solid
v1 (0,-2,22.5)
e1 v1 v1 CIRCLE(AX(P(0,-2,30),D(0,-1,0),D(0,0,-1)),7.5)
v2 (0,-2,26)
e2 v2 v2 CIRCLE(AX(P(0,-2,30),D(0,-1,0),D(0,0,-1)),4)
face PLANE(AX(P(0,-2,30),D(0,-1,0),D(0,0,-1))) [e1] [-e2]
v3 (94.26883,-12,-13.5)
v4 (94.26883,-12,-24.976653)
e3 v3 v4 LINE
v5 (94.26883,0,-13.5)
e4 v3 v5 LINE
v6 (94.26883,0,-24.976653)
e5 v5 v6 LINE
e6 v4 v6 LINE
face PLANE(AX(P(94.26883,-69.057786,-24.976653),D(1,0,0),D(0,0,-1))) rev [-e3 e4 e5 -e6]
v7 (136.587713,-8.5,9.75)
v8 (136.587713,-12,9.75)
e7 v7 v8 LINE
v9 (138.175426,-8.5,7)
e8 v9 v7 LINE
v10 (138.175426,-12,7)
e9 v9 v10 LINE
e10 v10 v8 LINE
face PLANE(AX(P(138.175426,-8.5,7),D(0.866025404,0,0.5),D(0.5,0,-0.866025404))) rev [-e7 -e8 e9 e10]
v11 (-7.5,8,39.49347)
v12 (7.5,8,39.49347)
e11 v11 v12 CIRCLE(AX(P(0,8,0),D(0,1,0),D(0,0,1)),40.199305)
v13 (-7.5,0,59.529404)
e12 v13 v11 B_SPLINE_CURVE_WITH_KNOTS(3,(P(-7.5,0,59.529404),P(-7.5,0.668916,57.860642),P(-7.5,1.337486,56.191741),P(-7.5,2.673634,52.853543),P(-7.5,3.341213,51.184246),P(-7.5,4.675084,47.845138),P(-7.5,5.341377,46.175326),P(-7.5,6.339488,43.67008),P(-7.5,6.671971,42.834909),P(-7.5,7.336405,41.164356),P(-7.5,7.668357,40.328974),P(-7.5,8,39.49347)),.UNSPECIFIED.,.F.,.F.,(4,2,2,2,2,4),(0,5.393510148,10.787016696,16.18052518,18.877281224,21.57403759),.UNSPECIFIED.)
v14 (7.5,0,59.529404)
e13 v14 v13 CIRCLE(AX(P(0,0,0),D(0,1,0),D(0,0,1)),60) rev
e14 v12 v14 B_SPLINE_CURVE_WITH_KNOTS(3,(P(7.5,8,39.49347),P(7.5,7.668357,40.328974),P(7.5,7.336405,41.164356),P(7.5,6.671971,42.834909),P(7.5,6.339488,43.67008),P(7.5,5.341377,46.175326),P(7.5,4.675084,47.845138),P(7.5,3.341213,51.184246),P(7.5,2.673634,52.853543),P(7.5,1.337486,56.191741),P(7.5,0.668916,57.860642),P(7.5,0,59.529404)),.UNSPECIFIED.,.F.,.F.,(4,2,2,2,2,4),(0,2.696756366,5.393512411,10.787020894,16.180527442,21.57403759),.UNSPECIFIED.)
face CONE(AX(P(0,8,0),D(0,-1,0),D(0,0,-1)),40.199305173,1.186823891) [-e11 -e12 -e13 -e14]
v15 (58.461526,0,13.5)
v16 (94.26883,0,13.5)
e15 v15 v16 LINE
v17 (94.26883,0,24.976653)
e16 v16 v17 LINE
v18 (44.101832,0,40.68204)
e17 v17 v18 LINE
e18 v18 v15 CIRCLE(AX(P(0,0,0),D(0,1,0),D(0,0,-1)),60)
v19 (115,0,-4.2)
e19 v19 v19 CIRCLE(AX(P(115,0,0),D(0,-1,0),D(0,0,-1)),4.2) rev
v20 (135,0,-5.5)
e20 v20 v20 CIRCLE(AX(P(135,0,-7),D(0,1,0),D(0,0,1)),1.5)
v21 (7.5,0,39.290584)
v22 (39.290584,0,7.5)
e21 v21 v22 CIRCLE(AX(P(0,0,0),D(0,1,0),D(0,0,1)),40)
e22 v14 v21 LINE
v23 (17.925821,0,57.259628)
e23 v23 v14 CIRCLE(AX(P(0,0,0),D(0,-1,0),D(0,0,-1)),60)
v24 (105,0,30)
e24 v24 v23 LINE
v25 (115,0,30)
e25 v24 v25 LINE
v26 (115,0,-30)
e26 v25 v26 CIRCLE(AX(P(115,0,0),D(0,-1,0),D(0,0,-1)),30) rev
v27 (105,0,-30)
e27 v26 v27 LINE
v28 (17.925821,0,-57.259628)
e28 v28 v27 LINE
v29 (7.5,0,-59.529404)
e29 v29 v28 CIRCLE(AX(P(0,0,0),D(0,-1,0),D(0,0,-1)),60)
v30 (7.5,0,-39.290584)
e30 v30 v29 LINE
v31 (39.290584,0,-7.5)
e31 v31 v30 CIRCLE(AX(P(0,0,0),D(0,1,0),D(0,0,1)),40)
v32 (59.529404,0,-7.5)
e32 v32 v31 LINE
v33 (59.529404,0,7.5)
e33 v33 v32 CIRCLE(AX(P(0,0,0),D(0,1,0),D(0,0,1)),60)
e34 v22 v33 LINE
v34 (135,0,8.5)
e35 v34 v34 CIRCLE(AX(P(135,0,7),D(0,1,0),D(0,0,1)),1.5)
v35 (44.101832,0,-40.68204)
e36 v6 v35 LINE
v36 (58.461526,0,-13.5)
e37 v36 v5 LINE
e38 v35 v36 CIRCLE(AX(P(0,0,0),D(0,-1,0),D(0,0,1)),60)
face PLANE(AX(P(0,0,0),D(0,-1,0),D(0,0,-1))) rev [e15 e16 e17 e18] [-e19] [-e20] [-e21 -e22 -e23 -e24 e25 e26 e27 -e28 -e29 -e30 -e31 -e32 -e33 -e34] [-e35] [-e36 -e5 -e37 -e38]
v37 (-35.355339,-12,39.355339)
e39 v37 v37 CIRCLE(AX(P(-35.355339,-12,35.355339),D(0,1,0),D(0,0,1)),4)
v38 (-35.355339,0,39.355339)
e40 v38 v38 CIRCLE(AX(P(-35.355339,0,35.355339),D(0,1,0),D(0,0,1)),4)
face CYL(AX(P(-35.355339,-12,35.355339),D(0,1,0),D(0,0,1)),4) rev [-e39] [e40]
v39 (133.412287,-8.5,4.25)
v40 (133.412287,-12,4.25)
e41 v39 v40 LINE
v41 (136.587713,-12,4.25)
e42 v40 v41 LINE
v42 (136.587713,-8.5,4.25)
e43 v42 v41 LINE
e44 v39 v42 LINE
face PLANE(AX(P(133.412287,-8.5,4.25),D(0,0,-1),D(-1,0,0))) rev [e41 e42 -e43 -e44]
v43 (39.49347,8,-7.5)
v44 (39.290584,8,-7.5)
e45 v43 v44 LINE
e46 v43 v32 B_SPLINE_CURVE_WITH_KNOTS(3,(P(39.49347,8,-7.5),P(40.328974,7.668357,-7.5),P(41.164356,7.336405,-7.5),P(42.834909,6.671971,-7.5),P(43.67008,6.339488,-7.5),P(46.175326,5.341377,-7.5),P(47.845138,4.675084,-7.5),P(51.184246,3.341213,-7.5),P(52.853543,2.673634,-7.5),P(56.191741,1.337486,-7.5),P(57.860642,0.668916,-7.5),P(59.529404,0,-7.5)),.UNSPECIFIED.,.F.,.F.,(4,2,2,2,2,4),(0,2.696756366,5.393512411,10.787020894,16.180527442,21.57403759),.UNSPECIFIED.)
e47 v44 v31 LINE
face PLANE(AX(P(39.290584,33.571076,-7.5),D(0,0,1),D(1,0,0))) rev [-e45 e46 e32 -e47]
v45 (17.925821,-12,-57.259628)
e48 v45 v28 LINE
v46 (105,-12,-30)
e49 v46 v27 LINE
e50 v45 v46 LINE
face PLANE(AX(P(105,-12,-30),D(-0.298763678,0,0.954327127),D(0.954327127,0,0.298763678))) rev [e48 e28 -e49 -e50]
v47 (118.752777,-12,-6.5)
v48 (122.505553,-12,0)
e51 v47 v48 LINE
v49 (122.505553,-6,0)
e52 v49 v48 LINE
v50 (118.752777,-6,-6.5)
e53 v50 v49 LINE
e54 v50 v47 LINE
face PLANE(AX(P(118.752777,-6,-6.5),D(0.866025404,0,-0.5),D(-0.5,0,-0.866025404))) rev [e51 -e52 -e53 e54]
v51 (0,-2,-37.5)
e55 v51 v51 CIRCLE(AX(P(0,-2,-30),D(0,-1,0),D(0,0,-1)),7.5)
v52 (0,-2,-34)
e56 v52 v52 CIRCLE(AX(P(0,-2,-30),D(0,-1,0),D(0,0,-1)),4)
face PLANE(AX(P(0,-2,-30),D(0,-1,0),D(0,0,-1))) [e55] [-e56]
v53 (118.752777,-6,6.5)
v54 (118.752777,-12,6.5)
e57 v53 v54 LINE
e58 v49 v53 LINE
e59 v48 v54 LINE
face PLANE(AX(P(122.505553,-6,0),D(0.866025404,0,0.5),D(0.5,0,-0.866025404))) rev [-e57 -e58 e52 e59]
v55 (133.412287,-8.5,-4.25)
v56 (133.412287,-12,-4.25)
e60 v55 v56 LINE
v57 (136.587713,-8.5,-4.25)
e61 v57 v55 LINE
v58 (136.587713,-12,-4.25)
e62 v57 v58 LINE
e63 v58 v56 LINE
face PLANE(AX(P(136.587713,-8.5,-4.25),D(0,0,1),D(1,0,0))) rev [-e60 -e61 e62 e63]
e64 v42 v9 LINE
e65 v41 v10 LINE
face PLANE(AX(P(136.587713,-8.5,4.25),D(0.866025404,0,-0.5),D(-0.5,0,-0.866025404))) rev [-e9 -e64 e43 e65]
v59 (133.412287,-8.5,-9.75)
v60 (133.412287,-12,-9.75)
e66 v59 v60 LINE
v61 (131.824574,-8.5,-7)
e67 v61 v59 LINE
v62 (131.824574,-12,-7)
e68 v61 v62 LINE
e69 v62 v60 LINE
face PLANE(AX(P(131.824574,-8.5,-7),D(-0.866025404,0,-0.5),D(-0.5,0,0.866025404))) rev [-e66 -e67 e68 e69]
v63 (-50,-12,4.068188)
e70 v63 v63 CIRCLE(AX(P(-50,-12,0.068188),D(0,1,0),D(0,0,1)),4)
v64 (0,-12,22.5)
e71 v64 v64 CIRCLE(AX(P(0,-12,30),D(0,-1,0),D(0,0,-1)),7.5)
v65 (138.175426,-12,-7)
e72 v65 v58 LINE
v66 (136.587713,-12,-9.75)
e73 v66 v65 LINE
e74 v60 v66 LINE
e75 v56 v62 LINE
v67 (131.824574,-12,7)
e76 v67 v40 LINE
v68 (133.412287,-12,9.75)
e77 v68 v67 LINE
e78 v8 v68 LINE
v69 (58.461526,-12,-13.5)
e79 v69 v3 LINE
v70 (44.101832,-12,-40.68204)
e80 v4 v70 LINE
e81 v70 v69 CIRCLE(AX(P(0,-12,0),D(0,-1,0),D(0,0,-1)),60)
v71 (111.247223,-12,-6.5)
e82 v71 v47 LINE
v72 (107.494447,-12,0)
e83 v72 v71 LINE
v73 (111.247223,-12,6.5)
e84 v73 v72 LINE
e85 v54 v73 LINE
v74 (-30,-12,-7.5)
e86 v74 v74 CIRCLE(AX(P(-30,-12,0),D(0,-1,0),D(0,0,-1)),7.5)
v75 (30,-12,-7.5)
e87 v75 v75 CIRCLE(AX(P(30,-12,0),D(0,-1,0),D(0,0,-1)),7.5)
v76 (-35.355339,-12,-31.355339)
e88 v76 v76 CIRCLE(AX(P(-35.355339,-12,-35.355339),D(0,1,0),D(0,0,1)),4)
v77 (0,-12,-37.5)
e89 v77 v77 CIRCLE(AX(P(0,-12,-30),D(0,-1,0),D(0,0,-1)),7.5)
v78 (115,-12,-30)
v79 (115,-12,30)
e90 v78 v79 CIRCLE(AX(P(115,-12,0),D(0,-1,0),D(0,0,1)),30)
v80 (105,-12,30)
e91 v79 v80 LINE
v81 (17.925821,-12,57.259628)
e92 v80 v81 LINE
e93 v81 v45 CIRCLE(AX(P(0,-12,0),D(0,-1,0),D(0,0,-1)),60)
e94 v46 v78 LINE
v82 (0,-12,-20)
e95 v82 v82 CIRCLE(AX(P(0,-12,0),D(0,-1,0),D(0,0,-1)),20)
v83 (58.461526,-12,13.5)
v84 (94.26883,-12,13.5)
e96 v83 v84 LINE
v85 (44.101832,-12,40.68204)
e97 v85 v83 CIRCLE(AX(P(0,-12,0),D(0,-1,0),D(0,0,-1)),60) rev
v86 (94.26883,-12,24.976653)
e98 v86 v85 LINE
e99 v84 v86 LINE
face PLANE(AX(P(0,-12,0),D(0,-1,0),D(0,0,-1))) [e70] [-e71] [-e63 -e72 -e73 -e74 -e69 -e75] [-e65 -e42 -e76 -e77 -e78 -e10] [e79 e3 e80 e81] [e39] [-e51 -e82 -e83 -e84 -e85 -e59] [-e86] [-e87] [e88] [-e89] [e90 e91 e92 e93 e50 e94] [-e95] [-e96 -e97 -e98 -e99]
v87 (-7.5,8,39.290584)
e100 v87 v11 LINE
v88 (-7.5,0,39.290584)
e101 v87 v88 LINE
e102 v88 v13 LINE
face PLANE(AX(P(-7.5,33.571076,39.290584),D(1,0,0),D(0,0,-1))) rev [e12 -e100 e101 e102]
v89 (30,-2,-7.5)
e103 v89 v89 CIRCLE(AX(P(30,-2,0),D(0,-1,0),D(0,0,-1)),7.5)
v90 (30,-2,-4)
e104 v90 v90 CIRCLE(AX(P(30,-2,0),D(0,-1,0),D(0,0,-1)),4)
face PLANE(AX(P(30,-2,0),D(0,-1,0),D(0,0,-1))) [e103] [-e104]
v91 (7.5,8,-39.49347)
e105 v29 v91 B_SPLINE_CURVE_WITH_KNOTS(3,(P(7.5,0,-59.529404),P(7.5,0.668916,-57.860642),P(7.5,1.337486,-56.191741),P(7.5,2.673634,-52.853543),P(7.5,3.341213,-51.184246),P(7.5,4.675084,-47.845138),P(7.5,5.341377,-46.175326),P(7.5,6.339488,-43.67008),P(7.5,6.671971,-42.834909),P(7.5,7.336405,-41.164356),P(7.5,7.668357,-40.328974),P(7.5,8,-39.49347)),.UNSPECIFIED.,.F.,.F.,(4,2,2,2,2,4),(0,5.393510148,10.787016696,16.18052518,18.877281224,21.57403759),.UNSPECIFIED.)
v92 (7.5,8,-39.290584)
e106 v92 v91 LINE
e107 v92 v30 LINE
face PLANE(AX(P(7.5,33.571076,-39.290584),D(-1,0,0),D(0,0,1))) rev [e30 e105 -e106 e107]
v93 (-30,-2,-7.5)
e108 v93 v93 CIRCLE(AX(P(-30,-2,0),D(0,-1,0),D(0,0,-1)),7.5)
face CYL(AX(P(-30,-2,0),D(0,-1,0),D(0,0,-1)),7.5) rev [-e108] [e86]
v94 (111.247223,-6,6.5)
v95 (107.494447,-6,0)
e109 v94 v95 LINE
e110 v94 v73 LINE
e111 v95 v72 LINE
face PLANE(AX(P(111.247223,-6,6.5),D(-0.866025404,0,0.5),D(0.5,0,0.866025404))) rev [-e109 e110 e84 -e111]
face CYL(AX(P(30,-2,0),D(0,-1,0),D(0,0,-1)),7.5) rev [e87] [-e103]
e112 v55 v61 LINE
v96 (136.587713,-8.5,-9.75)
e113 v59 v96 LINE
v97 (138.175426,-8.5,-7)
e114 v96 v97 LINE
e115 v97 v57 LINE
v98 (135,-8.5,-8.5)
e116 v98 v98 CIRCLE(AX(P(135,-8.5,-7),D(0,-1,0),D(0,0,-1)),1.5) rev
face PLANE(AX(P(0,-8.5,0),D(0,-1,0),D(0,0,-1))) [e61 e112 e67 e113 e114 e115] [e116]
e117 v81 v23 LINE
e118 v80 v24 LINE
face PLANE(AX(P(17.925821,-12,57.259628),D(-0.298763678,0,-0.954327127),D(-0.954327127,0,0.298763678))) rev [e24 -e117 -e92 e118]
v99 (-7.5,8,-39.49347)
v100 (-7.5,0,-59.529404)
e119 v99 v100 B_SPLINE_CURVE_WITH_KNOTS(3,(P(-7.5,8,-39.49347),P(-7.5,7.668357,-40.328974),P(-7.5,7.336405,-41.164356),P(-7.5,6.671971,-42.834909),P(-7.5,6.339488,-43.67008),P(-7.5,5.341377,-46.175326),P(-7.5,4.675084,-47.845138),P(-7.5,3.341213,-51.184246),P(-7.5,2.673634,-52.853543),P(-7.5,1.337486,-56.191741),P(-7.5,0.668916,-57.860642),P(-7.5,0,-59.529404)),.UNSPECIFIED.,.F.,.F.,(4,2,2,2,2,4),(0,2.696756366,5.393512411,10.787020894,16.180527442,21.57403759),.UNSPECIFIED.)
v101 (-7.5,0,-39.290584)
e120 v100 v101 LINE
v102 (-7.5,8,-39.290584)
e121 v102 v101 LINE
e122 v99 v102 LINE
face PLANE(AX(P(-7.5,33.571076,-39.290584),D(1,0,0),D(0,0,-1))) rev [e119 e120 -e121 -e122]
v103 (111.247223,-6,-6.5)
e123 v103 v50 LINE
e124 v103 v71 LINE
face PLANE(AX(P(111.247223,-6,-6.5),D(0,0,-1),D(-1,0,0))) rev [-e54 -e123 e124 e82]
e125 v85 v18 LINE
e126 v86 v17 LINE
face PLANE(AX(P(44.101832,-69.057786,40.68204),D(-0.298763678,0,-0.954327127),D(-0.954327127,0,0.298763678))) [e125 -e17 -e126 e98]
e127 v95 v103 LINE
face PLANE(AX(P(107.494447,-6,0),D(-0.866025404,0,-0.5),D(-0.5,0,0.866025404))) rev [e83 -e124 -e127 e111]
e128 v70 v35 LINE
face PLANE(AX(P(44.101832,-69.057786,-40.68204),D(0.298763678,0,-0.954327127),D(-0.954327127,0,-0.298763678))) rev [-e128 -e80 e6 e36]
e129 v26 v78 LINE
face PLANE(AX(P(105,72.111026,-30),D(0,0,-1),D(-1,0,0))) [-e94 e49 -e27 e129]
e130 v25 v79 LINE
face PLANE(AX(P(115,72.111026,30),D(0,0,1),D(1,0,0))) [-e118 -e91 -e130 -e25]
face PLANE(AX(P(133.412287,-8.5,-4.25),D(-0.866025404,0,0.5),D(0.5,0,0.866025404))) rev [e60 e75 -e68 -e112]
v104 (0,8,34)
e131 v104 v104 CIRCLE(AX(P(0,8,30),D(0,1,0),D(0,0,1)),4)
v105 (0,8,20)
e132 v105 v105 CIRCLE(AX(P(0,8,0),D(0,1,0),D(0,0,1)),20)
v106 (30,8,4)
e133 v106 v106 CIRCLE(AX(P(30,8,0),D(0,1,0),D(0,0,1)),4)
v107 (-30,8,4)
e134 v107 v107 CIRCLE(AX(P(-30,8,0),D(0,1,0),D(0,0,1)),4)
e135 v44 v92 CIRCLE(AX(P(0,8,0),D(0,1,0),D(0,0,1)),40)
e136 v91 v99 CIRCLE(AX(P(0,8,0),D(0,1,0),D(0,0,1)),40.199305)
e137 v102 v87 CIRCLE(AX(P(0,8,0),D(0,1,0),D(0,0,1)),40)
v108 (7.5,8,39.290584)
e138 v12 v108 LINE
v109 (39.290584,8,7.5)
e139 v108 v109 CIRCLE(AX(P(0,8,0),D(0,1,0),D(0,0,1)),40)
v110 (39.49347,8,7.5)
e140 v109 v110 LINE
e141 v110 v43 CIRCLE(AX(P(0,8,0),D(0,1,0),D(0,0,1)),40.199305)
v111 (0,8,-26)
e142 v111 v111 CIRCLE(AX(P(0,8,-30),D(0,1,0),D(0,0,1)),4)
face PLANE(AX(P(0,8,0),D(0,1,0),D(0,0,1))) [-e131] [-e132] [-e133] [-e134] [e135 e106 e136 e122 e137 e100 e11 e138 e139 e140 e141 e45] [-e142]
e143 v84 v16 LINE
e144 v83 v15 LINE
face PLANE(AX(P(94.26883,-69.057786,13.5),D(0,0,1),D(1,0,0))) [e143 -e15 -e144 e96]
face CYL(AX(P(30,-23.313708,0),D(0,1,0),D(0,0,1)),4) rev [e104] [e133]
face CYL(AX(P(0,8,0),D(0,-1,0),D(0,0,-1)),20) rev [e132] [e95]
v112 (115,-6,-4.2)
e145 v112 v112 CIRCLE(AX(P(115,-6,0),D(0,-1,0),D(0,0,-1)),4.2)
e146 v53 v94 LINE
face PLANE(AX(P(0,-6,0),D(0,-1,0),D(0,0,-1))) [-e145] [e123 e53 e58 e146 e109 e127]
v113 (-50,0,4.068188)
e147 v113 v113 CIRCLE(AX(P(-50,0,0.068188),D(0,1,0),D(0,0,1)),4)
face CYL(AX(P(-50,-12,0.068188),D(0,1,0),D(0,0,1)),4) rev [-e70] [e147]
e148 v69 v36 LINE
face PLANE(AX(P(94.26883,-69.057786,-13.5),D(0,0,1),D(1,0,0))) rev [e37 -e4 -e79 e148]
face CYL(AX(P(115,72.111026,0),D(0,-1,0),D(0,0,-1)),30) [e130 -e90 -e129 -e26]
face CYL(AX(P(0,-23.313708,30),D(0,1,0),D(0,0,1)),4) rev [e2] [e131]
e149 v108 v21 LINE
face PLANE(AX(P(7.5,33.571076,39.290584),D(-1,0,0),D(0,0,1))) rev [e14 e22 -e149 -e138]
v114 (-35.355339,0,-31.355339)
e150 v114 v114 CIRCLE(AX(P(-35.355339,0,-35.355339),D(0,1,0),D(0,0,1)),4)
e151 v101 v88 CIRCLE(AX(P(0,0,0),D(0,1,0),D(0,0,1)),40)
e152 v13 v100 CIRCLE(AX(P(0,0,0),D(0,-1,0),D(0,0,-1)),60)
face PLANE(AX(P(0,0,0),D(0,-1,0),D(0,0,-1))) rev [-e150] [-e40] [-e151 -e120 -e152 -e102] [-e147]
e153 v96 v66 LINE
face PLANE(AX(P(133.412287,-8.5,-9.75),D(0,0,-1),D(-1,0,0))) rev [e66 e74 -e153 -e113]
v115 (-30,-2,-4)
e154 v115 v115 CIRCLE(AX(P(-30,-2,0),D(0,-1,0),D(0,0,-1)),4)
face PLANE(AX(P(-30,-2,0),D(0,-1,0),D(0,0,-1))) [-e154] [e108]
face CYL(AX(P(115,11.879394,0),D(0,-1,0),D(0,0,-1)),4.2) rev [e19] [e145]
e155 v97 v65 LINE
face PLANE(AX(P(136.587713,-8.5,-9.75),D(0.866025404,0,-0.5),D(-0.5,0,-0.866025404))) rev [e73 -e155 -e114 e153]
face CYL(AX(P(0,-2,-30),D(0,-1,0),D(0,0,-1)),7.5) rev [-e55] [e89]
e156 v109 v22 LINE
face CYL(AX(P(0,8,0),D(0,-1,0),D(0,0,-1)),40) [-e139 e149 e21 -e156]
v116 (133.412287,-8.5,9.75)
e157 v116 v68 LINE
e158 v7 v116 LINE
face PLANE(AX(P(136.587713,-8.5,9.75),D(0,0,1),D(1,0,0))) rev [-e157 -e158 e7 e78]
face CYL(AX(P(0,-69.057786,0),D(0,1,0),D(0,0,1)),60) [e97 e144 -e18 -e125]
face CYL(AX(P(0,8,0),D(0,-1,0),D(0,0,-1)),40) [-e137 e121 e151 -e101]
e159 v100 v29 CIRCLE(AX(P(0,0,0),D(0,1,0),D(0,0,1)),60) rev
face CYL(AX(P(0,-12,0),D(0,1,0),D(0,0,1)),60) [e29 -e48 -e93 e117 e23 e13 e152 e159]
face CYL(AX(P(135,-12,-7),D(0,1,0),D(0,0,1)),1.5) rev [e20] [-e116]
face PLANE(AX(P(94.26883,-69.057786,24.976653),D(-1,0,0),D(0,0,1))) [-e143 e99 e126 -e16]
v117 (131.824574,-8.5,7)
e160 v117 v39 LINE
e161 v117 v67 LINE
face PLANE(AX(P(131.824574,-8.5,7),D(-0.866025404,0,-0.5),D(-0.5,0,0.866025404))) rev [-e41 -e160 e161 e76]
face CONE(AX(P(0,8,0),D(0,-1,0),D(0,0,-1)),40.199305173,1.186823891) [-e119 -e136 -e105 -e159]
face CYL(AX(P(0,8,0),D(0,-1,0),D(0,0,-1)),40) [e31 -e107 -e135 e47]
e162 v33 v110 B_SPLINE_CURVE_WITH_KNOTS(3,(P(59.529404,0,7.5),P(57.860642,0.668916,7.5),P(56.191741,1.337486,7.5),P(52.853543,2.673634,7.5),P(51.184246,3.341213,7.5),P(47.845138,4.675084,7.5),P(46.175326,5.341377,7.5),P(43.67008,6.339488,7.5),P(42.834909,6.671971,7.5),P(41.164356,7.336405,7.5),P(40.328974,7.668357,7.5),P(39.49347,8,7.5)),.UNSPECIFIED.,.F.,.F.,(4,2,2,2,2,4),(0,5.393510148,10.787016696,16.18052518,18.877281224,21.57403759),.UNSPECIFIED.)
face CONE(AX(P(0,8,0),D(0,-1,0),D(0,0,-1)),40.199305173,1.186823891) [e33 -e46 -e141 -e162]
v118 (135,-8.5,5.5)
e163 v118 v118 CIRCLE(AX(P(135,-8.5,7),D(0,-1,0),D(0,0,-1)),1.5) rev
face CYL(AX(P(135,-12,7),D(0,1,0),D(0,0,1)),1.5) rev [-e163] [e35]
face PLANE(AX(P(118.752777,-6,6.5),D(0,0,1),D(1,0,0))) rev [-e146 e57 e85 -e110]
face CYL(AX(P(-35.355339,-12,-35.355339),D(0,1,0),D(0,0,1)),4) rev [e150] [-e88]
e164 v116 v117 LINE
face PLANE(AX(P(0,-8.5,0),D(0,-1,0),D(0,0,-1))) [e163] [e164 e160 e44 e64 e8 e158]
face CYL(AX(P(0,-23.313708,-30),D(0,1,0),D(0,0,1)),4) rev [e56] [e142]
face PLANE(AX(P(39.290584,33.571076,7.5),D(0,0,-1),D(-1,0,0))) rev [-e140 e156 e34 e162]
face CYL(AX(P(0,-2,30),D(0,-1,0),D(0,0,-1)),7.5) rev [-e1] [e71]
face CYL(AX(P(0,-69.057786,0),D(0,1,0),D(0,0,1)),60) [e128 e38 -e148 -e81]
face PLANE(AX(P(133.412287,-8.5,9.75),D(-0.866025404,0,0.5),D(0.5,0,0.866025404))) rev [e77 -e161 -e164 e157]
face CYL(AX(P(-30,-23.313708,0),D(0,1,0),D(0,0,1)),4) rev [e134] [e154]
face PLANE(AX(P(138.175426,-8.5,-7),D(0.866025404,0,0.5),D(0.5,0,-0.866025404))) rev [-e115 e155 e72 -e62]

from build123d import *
from OCP.BRepFilletAPI import BRepFilletAPI_MakeChamfer
from build123d.topology import SkipClean

# Parameters (mm, degrees)
SKETCH1_R           = 40
SKETCH1_R_2         = 20
BOSS_EXTRUDE1_DEPTH = 8
BOSS_EXTRUDE2_START = 12
SKETCH3_R           = 20
BOSS_EXTRUDE2_DEPTH = 12
SKETCH5_R           = 7.5
CUT_EXTRUDE3_DEPTH  = 10
SKETCH2_R           = 4
CUT_EXTRUDE1_DEPTH  = 20
BOSS_EXTRUDE3_DEPTH = 8
CHAMFER1_SIZE       = 19.800694827
CHAMFER1_SIZE_2     = 8
BOSS_EXTRUDE4_DEPTH = 12
CUT_EXTRUDE4_DEPTH  = 6
SKETCH9_R           = 4.2
CUT_EXTRUDE5_DEPTH  = 6
CUT_EXTRUDE7_START  = -12
CUT_EXTRUDE7_DEPTH  = 12
SKETCH_1_R          = 4
CUT_EXTRUDE_1_DEPTH = 158.381701605
SKETCH_2_R          = 1.5
CUT_EXTRUDE_2_DEPTH = 158.381701605
CUT_EXTRUDE_3_DEPTH = 3.5
SKETCH_1_4_R        = 4
CUT_EXTRUDE_4_DEPTH = 158.381701605


with BuildPart() as part:
    # Sketch1 → Boss-Extrude1 (new body)
    with BuildSketch(Plane(origin=(0, 0, 0), x_dir=(1, 0, 0), z_dir=(0, 1, 0))):
        with Locations(Location((0, 0, 0), (0, 0, 270))):
            Circle(SKETCH1_R)
        with Locations(Location((0, 0, 0), (0, 0, 270))):
            Circle(SKETCH1_R_2, mode=Mode.SUBTRACT)
    extrude(amount=BOSS_EXTRUDE1_DEPTH)

    # Sketch3 → Boss-Extrude2 (add)
    with SkipClean():  # the faces are left unmerged after this step: merging them gives an invalid solid
        with BuildSketch(Plane.XZ.offset(BOSS_EXTRUDE2_START)):
            with BuildLine():
                Line((17.925820686, 57.259627599), (105, 30))
                Line((105, 30), (105, -30))
                Line((105, -30), (17.925820686, -57.259627599))
                ThreePointArc((17.925820686, -57.259627599), (-60, 0), (17.925820686, 57.259627599))
            make_face()
            with Locations(Location((0, 0, 0), (0, 0, 270))):
                Circle(SKETCH3_R, mode=Mode.SUBTRACT)
        extrude(amount=-BOSS_EXTRUDE2_DEPTH)

    # Sketch5 → Cut-Extrude3 (cut)
    with SkipClean():  # the faces are left unmerged after this step: merging them gives an invalid solid
        with BuildSketch(Plane.XZ.offset(12)):
            with Locations(Location((0, 30, 0), (0, 0, 270))):
                Circle(SKETCH5_R)
            with Locations(Location((30, 0, 0), (0, 0, 270))):
                Circle(SKETCH5_R)
            with Locations(Location((0, -30, 0), (0, 0, 270))):
                Circle(SKETCH5_R)
            with Locations(Location((-30, 0, 0), (0, 0, 270))):
                Circle(SKETCH5_R)
        extrude(amount=-CUT_EXTRUDE3_DEPTH, mode=Mode.SUBTRACT)

    # Sketch2 → Cut-Extrude1 (cut)
    with SkipClean():  # the faces are left unmerged after this step: merging them gives an invalid solid
        with BuildSketch(Plane(origin=(0, 8, 0), x_dir=(1, 0, 0), z_dir=(0, 1, 0))):
            with Locations(Location((30, 0, 0), (0, 0, 270))):
                Circle(SKETCH2_R)
            with Locations(Location((0, -30, 0), (0, 0, 270))):
                Circle(SKETCH2_R)
            with Locations(Location((-30, 0, 0), (0, 0, 270))):
                Circle(SKETCH2_R)
            with Locations(Location((0, 30, 0), (0, 0, 270))):
                Circle(SKETCH2_R)
        extrude(amount=-CUT_EXTRUDE1_DEPTH, mode=Mode.SUBTRACT)

    # Sketch6 → Boss-Extrude3 (add)
    with SkipClean():  # the faces are left unmerged after this step: merging them gives an invalid solid
        with BuildSketch(Plane(origin=(0, 0, 0), x_dir=(1, 0, 0), z_dir=(0, 1, 0))):
            with BuildLine():
                Line((-7.5, -39.290584114), (-7.5, -59.529404499))
                ThreePointArc((-7.5, -59.529404499), (0, -60), (7.5, -59.529404499))
                Line((7.5, -59.529404499), (7.5, -39.290584114))
                ThreePointArc((7.5, -39.290584114), (0, -40), (-7.5, -39.290584114))
            make_face()
            with BuildLine():
                Line((-7.5, 39.290584114), (-7.5, 59.529404499))
                ThreePointArc((-7.5, 59.529404499), (0, 60), (7.5, 59.529404499))
                Line((7.5, 59.529404499), (7.5, 39.290584114))
                ThreePointArc((7.5, 39.290584114), (0, 40), (-7.5, 39.290584114))
            make_face()
            with BuildLine():
                Line((39.290584114, 7.5), (59.529404499, 7.5))
                ThreePointArc((59.529404499, 7.5), (60, 0), (59.529404499, -7.5))
                Line((59.529404499, -7.5), (39.290584114, -7.5))
                ThreePointArc((39.290584114, -7.5), (40, 0), (39.290584114, 7.5))
            make_face()
        extrude(amount=BOSS_EXTRUDE3_DEPTH)

    # Chamfer1
    chamfer1_edges_1 = [part.edges().sort_by_distance(p)[0] for p in [
        (0, 8, -60),
    ]]
    chamfer1_side_1 = [part.faces().sort_by_distance(p)[0] for p in [
        (0, 8, -59.84),
    ]]
    chamfer1_edges_2 = [part.edges().sort_by_distance(p)[0] for p in [
        (60, 8, 0),
    ]]
    chamfer1_side_2 = [part.faces().sort_by_distance(p)[0] for p in [
        (60, 7.84, 0),
    ]]
    chamfer1_edges_3 = [part.edges().sort_by_distance(p)[0] for p in [
        (0, 8, 60),
    ]]
    chamfer1_side_3 = [part.faces().sort_by_distance(p)[0] for p in [
        (0, 8, 59.84),
    ]]
    chamfer1 = BRepFilletAPI_MakeChamfer(part.part.solid().wrapped)
    for e in chamfer1_edges_1:
        chamfer1.Add(CHAMFER1_SIZE - 0.0001, CHAMFER1_SIZE_2 - 0.0001, e.wrapped, chamfer1_side_1[0].wrapped)
    for e in chamfer1_edges_2:
        chamfer1.Add(CHAMFER1_SIZE_2 - 0.0001, CHAMFER1_SIZE - 0.0001, e.wrapped, chamfer1_side_2[0].wrapped)
    for e in chamfer1_edges_3:
        chamfer1.Add(CHAMFER1_SIZE - 0.0001, CHAMFER1_SIZE_2 - 0.0001, e.wrapped, chamfer1_side_3[0].wrapped)
    add(Compound.cast(chamfer1.Shape()), mode=Mode.REPLACE)  # a hair under: the kernel refuses the full size

    # Sketch7 → Boss-Extrude4 (add)
    with BuildSketch(Plane.XZ.offset(12)):
        with BuildLine():
            Line((115, 30), (105, 30))
            Line((105, 30), (105, -30))
            Line((105, -30), (115, -30))
            ThreePointArc((115, -30), (145, 0), (115, 30))
        make_face()
    extrude(amount=-BOSS_EXTRUDE4_DEPTH)

    # Sketch8 → Cut-Extrude4 (cut)
    with BuildSketch(Plane.XZ.offset(12)):
        Polygon((111.24722325, -6.5), (118.75277675, -6.5), (122.505553499, 0), (118.75277675, 6.5), (111.24722325, 6.5), (107.494446501, 0), align=None)
    extrude(amount=-CUT_EXTRUDE4_DEPTH, mode=Mode.SUBTRACT)

    # Sketch9 → Cut-Extrude5 (cut)
    with BuildSketch(Plane.XZ.offset(6)):
        with Locations(Location((115, 0, 0), (0, 0, 270))):
            Circle(SKETCH9_R)
    extrude(amount=-CUT_EXTRUDE5_DEPTH, mode=Mode.SUBTRACT)

    # Sketch11 → Cut-Extrude7 (cut)
    with BuildSketch(Plane(origin=(0, 0, 0), x_dir=(1, 0, 0), z_dir=(0, 1, 0)).offset(CUT_EXTRUDE7_START)):
        with BuildLine():
            Line((94.268829829, 24.976653188), (94.268829829, 13.5))
            Line((94.268829829, 13.5), (58.46152581, 13.5))
            ThreePointArc((58.46152581, 13.5), (53.052110577, 28.026301278), (44.101832404, 40.682040001))
            Line((44.101832404, 40.682040001), (94.268829829, 24.976653188))
        make_face()
    cut_extrude7 = extrude(amount=CUT_EXTRUDE7_DEPTH, mode=Mode.SUBTRACT)

    # Mirror1: Cut-Extrude7 across plane
    add(cut_extrude7.mirror(Plane.XY), mode=Mode.SUBTRACT)

    # 草图1 → 切除-拉伸1 (cut, through all)
    with BuildSketch(Plane(origin=(0, 0, 0), x_dir=(1, 0, 0), z_dir=(0, 1, 0))):
        with Locations(Location((-35.355339059, 35.355339059, 0), (0, 0, 270))):
            Circle(SKETCH_1_R)
        with Locations(Location((-35.355339059, -35.355339059, 0), (0, 0, 270))):
            Circle(SKETCH_1_R)
    extrude(amount=-CUT_EXTRUDE_1_DEPTH, mode=Mode.SUBTRACT)

    # 草图2 → 切除-拉伸2 (cut, through all)
    with BuildSketch(Plane(origin=(0, 0, 0), x_dir=(1, 0, 0), z_dir=(0, 1, 0))):
        with Locations(Location((135, -7, 0), (0, 0, 270))):
            Circle(SKETCH_2_R)
        with Locations(Location((135, 7, 0), (0, 0, 270))):
            Circle(SKETCH_2_R)
    extrude(amount=-CUT_EXTRUDE_2_DEPTH, mode=Mode.SUBTRACT)

    # 草图3 → 切除-拉伸3 (cut)
    with BuildSketch(Plane.XZ.offset(12)):
        Polygon((133.41228676, -9.75), (136.58771324, -9.75), (138.175426481, -7), (136.58771324, -4.25), (133.41228676, -4.25), (131.824573519, -7), align=None)
        Polygon((133.41228676, 4.25), (136.58771324, 4.25), (138.175426481, 7), (136.58771324, 9.75), (133.41228676, 9.75), (131.824573519, 7), align=None)
    extrude(amount=-CUT_EXTRUDE_3_DEPTH, mode=Mode.SUBTRACT)

    # 草图1<4> → 切除-拉伸4 (cut, through all)
    with BuildSketch(Plane(origin=(0, 0, 0), x_dir=(1, 0, 0), z_dir=(0, 1, 0))):
        with Locations(Location((-35.355339059, 35.355339059, 0), (0, 0, 270))):
            Circle(SKETCH_1_4_R)
        with Locations(Location((-35.355339059, -35.355339059, 0), (0, 0, 270))):
            Circle(SKETCH_1_4_R)
        with Locations(Location((-50, -0.068188384, 0), (0, 0, 270))):
            Circle(SKETCH_1_4_R)
    extrude(amount=-CUT_EXTRUDE_4_DEPTH, mode=Mode.SUBTRACT)


solid = part.part
